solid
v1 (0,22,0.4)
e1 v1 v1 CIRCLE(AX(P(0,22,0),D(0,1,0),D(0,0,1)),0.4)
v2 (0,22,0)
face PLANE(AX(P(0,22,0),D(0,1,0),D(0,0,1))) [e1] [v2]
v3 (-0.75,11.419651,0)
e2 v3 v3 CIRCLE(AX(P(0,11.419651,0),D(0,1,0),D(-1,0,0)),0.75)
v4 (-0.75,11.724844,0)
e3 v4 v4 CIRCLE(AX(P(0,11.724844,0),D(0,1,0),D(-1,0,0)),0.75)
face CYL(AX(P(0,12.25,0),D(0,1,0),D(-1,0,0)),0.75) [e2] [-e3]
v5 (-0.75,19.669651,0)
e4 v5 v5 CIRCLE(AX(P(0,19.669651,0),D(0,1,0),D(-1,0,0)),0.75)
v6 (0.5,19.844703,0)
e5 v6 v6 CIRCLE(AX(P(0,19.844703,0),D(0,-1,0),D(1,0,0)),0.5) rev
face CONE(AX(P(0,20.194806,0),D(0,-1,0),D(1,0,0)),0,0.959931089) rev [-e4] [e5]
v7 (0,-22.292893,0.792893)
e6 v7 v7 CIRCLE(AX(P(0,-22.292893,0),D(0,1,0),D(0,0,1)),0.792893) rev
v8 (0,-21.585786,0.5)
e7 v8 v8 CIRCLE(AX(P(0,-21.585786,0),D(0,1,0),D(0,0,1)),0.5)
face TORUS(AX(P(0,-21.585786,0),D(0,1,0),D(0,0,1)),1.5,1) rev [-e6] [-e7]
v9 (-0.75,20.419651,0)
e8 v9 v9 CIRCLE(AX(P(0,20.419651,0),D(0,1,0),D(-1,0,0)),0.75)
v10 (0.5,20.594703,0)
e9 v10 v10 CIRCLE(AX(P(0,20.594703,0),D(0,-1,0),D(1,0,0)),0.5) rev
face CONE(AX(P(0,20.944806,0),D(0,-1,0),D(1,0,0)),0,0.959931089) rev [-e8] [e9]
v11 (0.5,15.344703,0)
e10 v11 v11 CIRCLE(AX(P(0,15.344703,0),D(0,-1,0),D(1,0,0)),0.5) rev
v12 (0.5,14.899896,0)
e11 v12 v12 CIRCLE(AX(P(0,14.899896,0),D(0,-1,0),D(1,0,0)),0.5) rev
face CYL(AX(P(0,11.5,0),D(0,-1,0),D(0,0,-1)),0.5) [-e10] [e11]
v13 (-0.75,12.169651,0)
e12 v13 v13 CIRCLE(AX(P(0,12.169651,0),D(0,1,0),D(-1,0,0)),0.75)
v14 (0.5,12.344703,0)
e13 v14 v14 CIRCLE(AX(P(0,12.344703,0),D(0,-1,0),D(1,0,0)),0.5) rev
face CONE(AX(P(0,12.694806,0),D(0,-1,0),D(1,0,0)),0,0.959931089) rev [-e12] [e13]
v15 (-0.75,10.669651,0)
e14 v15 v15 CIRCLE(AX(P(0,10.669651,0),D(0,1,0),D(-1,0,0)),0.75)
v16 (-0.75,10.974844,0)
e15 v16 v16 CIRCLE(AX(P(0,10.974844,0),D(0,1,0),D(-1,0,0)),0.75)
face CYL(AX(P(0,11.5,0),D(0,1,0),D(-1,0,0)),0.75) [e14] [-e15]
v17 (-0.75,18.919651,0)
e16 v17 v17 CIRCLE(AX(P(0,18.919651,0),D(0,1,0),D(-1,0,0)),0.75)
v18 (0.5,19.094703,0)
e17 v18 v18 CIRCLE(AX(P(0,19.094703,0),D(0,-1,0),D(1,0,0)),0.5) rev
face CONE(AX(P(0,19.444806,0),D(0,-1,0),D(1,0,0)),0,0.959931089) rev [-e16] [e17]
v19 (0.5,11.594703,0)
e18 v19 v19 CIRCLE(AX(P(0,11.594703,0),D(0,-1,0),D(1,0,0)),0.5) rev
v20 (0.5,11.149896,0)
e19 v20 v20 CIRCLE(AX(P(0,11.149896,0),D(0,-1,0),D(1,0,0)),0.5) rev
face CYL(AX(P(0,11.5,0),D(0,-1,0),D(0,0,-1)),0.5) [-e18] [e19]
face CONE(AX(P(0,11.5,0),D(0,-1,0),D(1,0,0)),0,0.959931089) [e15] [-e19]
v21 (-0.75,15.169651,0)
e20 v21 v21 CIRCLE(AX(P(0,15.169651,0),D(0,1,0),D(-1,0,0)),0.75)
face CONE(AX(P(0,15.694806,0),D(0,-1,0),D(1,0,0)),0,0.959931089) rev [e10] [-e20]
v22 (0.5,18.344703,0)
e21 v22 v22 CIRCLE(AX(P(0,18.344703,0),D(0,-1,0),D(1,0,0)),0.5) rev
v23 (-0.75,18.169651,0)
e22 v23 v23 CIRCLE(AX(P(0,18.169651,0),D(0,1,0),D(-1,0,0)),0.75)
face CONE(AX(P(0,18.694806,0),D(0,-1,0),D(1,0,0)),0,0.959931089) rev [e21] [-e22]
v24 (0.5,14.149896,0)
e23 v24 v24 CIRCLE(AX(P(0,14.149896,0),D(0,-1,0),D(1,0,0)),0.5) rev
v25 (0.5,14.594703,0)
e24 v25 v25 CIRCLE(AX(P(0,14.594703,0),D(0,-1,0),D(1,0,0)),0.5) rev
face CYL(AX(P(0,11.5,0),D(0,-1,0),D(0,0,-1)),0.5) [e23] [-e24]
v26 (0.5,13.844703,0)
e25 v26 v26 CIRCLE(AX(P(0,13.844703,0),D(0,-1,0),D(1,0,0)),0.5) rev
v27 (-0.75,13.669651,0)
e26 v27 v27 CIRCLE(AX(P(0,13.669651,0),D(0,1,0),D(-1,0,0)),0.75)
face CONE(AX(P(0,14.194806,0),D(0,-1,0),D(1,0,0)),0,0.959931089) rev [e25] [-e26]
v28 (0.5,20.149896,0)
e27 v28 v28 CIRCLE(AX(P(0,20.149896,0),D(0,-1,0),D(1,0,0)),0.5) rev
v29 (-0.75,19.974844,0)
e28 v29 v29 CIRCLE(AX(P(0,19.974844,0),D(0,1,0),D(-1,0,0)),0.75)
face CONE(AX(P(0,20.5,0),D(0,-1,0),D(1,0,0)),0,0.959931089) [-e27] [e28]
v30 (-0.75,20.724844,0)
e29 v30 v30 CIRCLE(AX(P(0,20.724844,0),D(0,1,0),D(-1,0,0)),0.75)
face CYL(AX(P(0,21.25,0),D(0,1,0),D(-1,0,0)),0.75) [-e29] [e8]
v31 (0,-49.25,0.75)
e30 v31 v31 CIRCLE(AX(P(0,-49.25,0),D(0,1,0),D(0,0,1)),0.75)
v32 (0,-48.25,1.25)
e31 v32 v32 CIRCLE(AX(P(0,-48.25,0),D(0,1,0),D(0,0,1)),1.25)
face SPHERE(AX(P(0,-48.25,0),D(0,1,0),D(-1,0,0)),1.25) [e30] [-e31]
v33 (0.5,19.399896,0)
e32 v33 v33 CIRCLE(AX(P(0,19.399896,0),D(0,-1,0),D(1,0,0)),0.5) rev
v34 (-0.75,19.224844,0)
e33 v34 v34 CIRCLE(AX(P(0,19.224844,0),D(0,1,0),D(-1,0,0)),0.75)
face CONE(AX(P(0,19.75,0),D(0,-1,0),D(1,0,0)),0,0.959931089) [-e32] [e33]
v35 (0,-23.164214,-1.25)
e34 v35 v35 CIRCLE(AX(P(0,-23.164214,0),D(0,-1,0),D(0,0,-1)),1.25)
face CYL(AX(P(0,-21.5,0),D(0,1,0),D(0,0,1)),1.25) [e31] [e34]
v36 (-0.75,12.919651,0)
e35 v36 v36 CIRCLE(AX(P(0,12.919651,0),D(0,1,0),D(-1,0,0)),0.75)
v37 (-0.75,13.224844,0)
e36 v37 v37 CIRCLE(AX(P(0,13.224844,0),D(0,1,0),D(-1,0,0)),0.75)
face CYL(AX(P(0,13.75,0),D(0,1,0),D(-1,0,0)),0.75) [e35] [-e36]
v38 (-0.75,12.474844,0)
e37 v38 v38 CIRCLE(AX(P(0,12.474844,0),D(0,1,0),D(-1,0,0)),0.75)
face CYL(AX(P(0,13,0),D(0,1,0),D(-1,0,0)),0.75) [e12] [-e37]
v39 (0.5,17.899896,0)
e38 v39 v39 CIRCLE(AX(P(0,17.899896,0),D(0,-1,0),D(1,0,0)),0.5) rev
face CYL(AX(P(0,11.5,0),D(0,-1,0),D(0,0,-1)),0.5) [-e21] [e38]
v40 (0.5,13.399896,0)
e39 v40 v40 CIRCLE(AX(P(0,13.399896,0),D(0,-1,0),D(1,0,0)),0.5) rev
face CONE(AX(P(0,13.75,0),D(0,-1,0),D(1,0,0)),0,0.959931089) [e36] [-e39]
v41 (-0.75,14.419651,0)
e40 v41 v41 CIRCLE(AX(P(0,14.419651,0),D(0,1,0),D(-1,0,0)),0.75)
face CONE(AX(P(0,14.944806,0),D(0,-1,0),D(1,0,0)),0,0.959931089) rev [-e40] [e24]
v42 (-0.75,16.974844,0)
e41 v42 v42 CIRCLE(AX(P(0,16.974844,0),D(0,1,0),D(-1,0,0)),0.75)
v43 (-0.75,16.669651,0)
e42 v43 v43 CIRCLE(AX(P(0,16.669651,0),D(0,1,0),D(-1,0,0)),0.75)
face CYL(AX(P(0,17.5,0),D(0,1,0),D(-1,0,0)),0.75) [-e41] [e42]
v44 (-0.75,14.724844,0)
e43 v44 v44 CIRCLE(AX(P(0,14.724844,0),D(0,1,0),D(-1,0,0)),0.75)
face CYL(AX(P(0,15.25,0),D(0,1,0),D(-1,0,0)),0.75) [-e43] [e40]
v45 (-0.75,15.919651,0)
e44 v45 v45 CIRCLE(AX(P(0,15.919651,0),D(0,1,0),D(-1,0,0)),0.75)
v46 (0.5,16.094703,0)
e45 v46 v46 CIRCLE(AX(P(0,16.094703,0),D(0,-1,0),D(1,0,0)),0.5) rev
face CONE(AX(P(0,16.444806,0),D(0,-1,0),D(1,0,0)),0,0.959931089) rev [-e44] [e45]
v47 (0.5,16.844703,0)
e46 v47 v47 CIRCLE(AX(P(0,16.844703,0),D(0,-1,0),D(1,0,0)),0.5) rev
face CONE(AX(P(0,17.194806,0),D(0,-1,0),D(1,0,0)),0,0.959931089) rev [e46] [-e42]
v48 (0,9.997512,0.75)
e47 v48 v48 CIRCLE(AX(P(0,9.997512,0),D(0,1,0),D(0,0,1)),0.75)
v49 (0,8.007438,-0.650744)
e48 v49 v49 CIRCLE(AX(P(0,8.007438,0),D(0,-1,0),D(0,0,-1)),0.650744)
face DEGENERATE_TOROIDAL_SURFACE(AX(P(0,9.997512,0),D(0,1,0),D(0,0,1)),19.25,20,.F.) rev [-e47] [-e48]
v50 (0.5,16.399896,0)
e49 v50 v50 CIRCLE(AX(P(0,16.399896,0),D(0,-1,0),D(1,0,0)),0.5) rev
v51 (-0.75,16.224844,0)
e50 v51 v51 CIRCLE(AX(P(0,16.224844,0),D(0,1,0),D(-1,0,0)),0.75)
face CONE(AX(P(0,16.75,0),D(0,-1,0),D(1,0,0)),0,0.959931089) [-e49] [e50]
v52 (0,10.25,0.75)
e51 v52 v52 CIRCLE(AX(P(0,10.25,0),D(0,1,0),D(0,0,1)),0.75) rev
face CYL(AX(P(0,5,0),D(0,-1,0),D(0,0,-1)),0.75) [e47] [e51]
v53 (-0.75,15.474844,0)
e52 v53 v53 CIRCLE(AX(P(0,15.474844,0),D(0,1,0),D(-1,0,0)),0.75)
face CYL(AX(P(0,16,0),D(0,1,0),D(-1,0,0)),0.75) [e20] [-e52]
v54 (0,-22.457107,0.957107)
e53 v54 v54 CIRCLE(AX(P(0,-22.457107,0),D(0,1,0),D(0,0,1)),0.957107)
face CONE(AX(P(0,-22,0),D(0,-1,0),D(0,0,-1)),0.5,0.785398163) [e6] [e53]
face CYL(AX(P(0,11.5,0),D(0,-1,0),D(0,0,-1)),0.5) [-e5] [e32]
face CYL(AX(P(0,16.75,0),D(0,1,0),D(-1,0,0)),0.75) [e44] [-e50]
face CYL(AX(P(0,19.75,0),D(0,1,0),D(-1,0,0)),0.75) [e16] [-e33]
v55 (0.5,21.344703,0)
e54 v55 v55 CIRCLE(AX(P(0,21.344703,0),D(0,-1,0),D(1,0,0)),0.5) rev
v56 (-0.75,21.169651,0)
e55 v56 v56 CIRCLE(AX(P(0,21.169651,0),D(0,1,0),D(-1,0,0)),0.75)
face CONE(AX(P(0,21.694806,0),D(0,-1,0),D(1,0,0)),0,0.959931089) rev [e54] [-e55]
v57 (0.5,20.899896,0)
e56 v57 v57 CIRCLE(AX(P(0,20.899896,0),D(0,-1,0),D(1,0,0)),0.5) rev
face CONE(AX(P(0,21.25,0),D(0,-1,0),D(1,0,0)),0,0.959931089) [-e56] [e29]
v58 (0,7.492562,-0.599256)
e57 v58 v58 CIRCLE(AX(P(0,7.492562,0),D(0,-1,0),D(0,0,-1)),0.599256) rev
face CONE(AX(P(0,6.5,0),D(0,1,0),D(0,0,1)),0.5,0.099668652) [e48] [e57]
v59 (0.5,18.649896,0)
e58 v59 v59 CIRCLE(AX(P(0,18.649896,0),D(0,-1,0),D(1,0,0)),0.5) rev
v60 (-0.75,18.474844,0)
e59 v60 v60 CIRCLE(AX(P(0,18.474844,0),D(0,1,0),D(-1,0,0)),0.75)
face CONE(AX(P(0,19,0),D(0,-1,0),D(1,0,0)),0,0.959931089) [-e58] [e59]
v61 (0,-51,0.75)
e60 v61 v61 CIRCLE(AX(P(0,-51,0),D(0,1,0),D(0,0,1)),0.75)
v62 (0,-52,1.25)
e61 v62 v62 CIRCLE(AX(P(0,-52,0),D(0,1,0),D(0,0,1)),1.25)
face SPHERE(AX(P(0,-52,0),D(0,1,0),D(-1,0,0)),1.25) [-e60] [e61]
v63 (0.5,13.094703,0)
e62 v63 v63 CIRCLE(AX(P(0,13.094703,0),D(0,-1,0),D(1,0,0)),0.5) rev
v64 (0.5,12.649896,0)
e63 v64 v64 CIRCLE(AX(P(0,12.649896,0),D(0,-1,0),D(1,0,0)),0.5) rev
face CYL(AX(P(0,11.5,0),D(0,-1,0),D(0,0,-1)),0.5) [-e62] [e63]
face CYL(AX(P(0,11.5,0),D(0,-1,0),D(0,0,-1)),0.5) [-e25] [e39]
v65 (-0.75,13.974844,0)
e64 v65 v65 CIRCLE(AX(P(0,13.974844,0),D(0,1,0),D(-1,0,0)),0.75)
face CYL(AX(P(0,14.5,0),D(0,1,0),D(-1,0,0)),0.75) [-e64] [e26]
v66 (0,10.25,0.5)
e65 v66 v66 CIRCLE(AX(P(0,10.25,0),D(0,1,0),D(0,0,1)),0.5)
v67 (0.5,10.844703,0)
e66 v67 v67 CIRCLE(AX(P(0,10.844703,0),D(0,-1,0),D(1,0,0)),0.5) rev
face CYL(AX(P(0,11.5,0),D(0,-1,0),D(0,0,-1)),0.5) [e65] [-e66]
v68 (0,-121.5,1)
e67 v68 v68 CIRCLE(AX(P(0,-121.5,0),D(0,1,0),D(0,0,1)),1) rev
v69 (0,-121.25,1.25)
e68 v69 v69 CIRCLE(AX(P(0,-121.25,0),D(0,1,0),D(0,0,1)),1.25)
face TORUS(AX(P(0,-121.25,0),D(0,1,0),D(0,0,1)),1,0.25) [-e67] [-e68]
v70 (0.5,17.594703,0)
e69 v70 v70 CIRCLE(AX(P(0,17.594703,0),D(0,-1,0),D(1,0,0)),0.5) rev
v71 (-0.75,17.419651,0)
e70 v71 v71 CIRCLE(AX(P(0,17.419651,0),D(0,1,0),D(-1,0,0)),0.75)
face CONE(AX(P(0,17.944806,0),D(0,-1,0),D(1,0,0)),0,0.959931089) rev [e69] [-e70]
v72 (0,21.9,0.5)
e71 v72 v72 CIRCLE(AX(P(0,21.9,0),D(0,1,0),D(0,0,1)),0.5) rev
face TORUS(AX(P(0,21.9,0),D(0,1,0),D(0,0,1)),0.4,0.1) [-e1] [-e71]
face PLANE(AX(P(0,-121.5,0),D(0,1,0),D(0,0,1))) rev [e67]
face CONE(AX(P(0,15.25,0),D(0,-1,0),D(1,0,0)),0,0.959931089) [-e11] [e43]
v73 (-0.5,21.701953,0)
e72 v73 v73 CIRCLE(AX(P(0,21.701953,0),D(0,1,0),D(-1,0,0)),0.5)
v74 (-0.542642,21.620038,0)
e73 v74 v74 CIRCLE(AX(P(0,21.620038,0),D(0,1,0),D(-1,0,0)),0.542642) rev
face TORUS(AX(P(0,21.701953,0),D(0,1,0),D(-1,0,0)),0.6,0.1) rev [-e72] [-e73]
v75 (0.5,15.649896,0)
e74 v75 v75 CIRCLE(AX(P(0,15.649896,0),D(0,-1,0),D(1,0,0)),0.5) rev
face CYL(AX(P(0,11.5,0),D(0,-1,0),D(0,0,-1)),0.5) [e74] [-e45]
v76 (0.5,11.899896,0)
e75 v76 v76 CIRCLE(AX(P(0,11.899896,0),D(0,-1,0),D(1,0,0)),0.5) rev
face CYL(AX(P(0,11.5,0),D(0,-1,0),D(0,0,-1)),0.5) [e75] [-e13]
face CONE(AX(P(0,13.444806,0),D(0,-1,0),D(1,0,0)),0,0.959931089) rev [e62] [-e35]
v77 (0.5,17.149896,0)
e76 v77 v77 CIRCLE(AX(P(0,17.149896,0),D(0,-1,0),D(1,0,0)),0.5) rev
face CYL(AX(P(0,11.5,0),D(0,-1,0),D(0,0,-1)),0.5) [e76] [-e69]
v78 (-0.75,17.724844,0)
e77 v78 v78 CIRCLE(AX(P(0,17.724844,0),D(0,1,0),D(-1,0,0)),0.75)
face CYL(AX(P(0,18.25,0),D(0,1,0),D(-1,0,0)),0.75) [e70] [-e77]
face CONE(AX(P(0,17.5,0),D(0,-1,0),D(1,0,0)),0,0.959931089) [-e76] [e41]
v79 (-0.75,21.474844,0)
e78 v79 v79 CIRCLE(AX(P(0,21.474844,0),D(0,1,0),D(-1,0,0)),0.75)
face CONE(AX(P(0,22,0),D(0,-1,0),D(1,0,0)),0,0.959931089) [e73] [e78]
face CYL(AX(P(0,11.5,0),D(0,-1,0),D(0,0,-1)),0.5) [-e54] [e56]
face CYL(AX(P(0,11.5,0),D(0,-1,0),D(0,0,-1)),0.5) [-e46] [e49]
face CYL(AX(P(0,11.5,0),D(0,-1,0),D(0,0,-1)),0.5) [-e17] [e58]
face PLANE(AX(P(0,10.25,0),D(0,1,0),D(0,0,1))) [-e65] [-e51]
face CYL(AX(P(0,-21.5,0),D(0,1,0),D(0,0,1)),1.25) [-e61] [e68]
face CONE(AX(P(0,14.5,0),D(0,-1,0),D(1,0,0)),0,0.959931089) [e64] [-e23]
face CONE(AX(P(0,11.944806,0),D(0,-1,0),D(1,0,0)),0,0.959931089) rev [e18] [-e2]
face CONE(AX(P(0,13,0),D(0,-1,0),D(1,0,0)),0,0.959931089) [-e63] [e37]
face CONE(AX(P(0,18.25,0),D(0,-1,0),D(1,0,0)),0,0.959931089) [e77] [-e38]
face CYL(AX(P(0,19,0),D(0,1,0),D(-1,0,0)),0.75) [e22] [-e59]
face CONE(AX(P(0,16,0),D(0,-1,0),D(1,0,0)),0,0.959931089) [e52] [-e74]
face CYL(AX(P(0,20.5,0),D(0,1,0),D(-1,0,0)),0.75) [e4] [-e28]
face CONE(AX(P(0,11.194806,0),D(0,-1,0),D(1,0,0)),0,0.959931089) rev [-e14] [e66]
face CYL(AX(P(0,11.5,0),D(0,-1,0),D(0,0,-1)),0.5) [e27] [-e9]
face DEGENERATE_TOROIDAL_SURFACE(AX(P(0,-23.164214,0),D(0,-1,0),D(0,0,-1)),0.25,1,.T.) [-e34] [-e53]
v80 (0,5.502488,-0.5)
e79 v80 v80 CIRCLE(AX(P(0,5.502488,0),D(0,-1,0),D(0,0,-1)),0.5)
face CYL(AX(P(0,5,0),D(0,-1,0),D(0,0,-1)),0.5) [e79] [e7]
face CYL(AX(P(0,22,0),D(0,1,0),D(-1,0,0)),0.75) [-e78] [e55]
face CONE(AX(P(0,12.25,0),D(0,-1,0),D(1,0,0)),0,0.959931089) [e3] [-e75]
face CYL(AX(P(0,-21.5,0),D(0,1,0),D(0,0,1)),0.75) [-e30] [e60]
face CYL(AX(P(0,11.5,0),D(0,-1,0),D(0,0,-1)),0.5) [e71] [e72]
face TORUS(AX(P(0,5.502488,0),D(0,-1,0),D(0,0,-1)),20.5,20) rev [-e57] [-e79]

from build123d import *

# Parameters (mm, degrees)
SKETCH2_R           = 0.5
BOSS_EXTRUDE1_DEPTH = 5
FILLET1_R           = 20
BOSS_EXTRUDE3_DEPTH = 1
MOVE_FACE1_BY       = 0.25
BOSS_EXTRUDE4_START = 21.5
SKETCH8_R           = 0.5
BOSS_EXTRUDE4_DEPTH = 21.5
FILLET6_R           = 0.25
FILLET7_R           = 1
LPATTERN1_COUNT     = 15
LPATTERN1_PITCH     = 0.75
FILLET8_R           = 0.1


with BuildPart() as part:
    # Sketch2 → Boss-Extrude1 (new body)
    with BuildSketch(Plane(origin=(0, 0, 0), x_dir=(1, 0, 0), z_dir=(0, 1, 0))):
        with Locations(Location((0, 0, 0), (0, 0, 270))):
            Circle(SKETCH2_R)
    extrude(amount=BOSS_EXTRUDE1_DEPTH)

    # Sketch4 → Revolve1 (revolve)
    with BuildSketch(Plane(origin=(0, 0, 0), x_dir=(0, 0, -1), z_dir=(1, 0, 0))):
        Polygon((0, 5.000000000000001), (0, 10.500000000000002), (0.75, 10.500000000000002), (0.7500000000000002, 9.000000000000002), (0.5, 6.500000000000001), (0.5, 5.000000000000001), align=None)
    revolve(axis=Axis((0, 5.000000000000001, 0), (0, 1, 0)))

    # Fillet1
    # the kernel refuses this fillet: 20 mm, written as the material it adds along each edge
    with BuildSketch(Plane(origin=(0, 6.500000000000001, 0), x_dir=(0, 0, -1), z_dir=(1, 0, 0))) as fillet1_piece_1:
        with BuildLine():
            CenterArc((0.5 + FILLET1_R, -FILLET1_R * 0.0498756211209), FILLET1_R, 174.28940686250036, 5.710593137499643)
            Line((0.5 + FILLET1_R * 0.00496280979001, FILLET1_R * 0.0496280979001), (0.5, 0))
            Line((0.5, 0), (0.5, -FILLET1_R * 0.0498756211209))
        make_face()
    revolve(axis=Axis((0, 6.500000000000001, 0), (0, 1, 0)))
    # the kernel refuses this fillet: 20 mm, written as the material it takes off along each edge
    with BuildSketch(Plane(origin=(0, 9.000000000000002, 0), x_dir=(0, 0, -1), z_dir=(1, 0, 0))) as fillet1_2_piece_1:
        with BuildLine():
            CenterArc((0.7500000000000002 - FILLET1_R, FILLET1_R * 0.0498756211209), FILLET1_R, 354.28940686250036, 5.710593137499647)
            Line((0.75, FILLET1_R * 0.0498756211209), (0.7500000000000002, 0))
            Line((0.7500000000000002, 0), (0.7500000000000002 - FILLET1_R * 0.00496280979001, -FILLET1_R * 0.0496280979001))
        make_face()
    revolve(axis=Axis((0, 9.000000000000002, 0), (0, 1, 0)), mode=Mode.SUBTRACT)

    # Sketch5 → Boss-Extrude3 (add)
    with BuildSketch(Plane(origin=(0, 10.500000000000002, 0), x_dir=(1, 0, 0), z_dir=(0, 1, 0))):
        with BuildLine():
            ThreePointArc((0.12499999999999366, 0.48412291827592874), (-1.329e-14, 0.5), (-0.1250000000000195, 0.4841229182759221))
            Line((-0.12500000000000006, 0.48412291827591764), (-0.12500000000000003, 0.125))
            Line((-0.125, 0.125), (0.125, 0.125))
            Line((0.12499999999999999, 0.125), (0.12499999999999994, 0.4841229182759302))
        make_face()
        with BuildLine():
            Line((0.48412291827592446, 0.125), (0.125, 0.125))
            Line((0.12499999999999999, 0.125), (0.12500000000000003, -0.125))
            Line((0.125, -0.125), (0.48412291827592446, -0.125))
            ThreePointArc((0.48412291827592574, -0.12500000000000536), (0.49601484813358304, -0.06300214624136663), (0.5, -1.2e-16))
            ThreePointArc((0.5, 0), (0.496014848133583, 0.06300214624136691), (0.4841229182759257, 0.12500000000000558))
        make_face()
        with BuildLine():
            ThreePointArc((0.4841229182759257, 0.12500000000000558), (0.3535533905932694, 0.35355339059327817), (0.12499999999999366, 0.48412291827592874))
            Line((0.12499999999999994, 0.4841229182759302), (0.12499999999999999, 0.125))
            Line((0.125, 0.125), (0.48412291827592446, 0.125))
        make_face()
        with BuildLine():
            Line((0.48412291827592446, -0.125), (0.125, -0.125))
            Line((0.12500000000000003, -0.125), (0.12500000000000006, -0.48412291827593024))
            ThreePointArc((0.12499999999999353, -0.4841229182759288), (0.3535533905932696, -0.3535533905932779), (0.48412291827592574, -0.12500000000000536))
        make_face()
        with BuildLine():
            Line((0.125, -0.125), (-0.125, -0.125))
            Line((-0.12499999999999999, -0.125), (-0.12499999999999994, -0.4841229182759178))
            ThreePointArc((-0.1250000000000195, -0.4841229182759221), (-1.341e-14, -0.5), (0.12499999999999353, -0.4841229182759288))
            Line((0.12500000000000006, -0.48412291827593024), (0.12500000000000003, -0.125))
        make_face()
        Polygon((0.125, 0.125), (-0.125, 0.125), (-0.12499999999999999, -0.125), (0.125, -0.125), align=None)
        with BuildLine():
            Line((-0.12499999999999999, -0.125), (-0.12500000000000003, 0.125))
            Line((-0.125, 0.125), (-0.48412291827591875, 0.125))
            ThreePointArc((-0.48412291827592263, 0.12500000000001735), (-0.5, 6e-17), (-0.4841229182759227, -0.1250000000000172))
            Line((-0.48412291827591875, -0.125), (-0.125, -0.125))
        make_face()
        with BuildLine():
            Line((-0.12500000000000003, 0.125), (-0.12500000000000006, 0.48412291827591764))
            ThreePointArc((-0.1250000000000195, 0.4841229182759221), (-0.3535533905932745, 0.353553390593273), (-0.48412291827592263, 0.12500000000001735))
            Line((-0.48412291827591875, 0.125), (-0.125, 0.125))
        make_face()
        with BuildLine():
            Line((-0.12499999999999994, -0.4841229182759178), (-0.12499999999999999, -0.125))
            Line((-0.125, -0.125), (-0.48412291827591875, -0.125))
            ThreePointArc((-0.4841229182759227, -0.1250000000000172), (-0.3535533905932746, -0.3535533905932729), (-0.1250000000000195, -0.4841229182759221))
        make_face()
    boss_extrude3 = extrude(amount=BOSS_EXTRUDE3_DEPTH)

    # Sketch10 → Revolve5 (revolve)
    with BuildSketch(Plane.XY):
        Polygon((0, 11.500000000000004), (0.7500000000000002, 10.974844346342728), (0.75, 10.669650699152365), (5e-17, 11.19480635280964), align=None)
    revolve5 = revolve(axis=Axis((0, 11.500000000000004, 0), (1.8e-16, -1, 0)))

    # Move Face1: a face moved inward by 0.25
    extrude(part.faces().sort_by_distance((0.6, 10.5, 0))[0], amount=MOVE_FACE1_BY, dir=(0, -1, 0), mode=Mode.SUBTRACT)

    # Sketch8 → Boss-Extrude4 (add)
    with BuildSketch(Plane(origin=(0, 0, 0), x_dir=(-1, 0, 0), z_dir=(0, -1, 0)).offset(BOSS_EXTRUDE4_START)):
        with Locations(Location((0, 0, 0), (0, 0, 180))):
            Circle(SKETCH8_R)
    extrude(amount=-BOSS_EXTRUDE4_DEPTH)

    # Sketch9 → Revolve4 (revolve)
    with BuildSketch(Plane.XY, mode=Mode.PRIVATE) as revolve4_sk:
        with BuildLine():
            Line((0, -21.5), (-0.5, -21.5))
            Line((-0.5, -21.5), (-0.4999999999999998, -22))
            Line((-0.4999999999999998, -22), (-1.2499999999999998, -22.75))
            Line((-1.2499999999999998, -22.75), (-1.2499999999999998, -23.25))
            Line((-1.2499999999999998, -23.25), (-1.2499999999999967, -48.25))
            ThreePointArc((-1.249999999999998, -48.25), (-1.1180339887498931, -48.80901699437494), (-0.7499999999999993, -49.24999999999999))
            Line((-0.7499999999999999, -49.24999999999999), (-0.7499999999999997, -51.00000000000001))
            ThreePointArc((-0.7499999999999996, -51.00000000000001), (-1.1180339887498953, -51.44098300562506), (-1.2499999999999964, -52.00000000000001))
            Line((-1.2499999999999964, -52.00000000000001), (-1.2499999999999876, -120.25))
            Line((-1.2499999999999876, -120.25000000000001), (-1.2499999999999878, -121.50000000000001))
            Line((-1.2499999999999878, -121.50000000000001), (0, -121.50000000000001))
            Line((0, -121.5), (0, -52.00000000000001))
            Line((4.6e-16, -52.00000000000001), (0, -48.25))
            Line((0, -48.25), (0, -21.5))
        make_face()
    revolve(revolve4_sk.sketch.rotate(Axis((0, -21.5, 0), (0, -1, 0)), 270), axis=Axis((0, -21.5, 0), (0, -1, 0)))

    # Fillet6
    fillet6_edges = [part.edges().sort_by_distance(p)[0] for p in [
        (-4.3e-16, -121.50000000000001, -1.2499999999999878),
    ]]
    fillet(fillet6_edges, radius=FILLET6_R)

    # Fillet7
    fillet7_edges = [part.edges().sort_by_distance(p)[0] for p in [
        (-1.7e-16, -22, -0.4999999999999998),
        (-4.3e-16, -22.75, -1.2499999999999998),
    ]]
    fillet(fillet7_edges, radius=FILLET7_R)

    # LPattern1: Boss-Extrude3, Revolve5 ×15
    with Locations(*[(0, i * LPATTERN1_PITCH, 0) for i in range(1, LPATTERN1_COUNT)]):
        add(boss_extrude3)
        add(revolve5)

    # Fillet8
    fillet8_edges = [part.edges().sort_by_distance(p)[0] for p in [
        (0.3061862178478884, 21.649896230895155, -0.39528470752105255),
        (0.125000000000012, 22, 0.48412291827592546),
    ]]
    fillet(fillet8_edges, radius=FILLET8_R)


solid = part.part
